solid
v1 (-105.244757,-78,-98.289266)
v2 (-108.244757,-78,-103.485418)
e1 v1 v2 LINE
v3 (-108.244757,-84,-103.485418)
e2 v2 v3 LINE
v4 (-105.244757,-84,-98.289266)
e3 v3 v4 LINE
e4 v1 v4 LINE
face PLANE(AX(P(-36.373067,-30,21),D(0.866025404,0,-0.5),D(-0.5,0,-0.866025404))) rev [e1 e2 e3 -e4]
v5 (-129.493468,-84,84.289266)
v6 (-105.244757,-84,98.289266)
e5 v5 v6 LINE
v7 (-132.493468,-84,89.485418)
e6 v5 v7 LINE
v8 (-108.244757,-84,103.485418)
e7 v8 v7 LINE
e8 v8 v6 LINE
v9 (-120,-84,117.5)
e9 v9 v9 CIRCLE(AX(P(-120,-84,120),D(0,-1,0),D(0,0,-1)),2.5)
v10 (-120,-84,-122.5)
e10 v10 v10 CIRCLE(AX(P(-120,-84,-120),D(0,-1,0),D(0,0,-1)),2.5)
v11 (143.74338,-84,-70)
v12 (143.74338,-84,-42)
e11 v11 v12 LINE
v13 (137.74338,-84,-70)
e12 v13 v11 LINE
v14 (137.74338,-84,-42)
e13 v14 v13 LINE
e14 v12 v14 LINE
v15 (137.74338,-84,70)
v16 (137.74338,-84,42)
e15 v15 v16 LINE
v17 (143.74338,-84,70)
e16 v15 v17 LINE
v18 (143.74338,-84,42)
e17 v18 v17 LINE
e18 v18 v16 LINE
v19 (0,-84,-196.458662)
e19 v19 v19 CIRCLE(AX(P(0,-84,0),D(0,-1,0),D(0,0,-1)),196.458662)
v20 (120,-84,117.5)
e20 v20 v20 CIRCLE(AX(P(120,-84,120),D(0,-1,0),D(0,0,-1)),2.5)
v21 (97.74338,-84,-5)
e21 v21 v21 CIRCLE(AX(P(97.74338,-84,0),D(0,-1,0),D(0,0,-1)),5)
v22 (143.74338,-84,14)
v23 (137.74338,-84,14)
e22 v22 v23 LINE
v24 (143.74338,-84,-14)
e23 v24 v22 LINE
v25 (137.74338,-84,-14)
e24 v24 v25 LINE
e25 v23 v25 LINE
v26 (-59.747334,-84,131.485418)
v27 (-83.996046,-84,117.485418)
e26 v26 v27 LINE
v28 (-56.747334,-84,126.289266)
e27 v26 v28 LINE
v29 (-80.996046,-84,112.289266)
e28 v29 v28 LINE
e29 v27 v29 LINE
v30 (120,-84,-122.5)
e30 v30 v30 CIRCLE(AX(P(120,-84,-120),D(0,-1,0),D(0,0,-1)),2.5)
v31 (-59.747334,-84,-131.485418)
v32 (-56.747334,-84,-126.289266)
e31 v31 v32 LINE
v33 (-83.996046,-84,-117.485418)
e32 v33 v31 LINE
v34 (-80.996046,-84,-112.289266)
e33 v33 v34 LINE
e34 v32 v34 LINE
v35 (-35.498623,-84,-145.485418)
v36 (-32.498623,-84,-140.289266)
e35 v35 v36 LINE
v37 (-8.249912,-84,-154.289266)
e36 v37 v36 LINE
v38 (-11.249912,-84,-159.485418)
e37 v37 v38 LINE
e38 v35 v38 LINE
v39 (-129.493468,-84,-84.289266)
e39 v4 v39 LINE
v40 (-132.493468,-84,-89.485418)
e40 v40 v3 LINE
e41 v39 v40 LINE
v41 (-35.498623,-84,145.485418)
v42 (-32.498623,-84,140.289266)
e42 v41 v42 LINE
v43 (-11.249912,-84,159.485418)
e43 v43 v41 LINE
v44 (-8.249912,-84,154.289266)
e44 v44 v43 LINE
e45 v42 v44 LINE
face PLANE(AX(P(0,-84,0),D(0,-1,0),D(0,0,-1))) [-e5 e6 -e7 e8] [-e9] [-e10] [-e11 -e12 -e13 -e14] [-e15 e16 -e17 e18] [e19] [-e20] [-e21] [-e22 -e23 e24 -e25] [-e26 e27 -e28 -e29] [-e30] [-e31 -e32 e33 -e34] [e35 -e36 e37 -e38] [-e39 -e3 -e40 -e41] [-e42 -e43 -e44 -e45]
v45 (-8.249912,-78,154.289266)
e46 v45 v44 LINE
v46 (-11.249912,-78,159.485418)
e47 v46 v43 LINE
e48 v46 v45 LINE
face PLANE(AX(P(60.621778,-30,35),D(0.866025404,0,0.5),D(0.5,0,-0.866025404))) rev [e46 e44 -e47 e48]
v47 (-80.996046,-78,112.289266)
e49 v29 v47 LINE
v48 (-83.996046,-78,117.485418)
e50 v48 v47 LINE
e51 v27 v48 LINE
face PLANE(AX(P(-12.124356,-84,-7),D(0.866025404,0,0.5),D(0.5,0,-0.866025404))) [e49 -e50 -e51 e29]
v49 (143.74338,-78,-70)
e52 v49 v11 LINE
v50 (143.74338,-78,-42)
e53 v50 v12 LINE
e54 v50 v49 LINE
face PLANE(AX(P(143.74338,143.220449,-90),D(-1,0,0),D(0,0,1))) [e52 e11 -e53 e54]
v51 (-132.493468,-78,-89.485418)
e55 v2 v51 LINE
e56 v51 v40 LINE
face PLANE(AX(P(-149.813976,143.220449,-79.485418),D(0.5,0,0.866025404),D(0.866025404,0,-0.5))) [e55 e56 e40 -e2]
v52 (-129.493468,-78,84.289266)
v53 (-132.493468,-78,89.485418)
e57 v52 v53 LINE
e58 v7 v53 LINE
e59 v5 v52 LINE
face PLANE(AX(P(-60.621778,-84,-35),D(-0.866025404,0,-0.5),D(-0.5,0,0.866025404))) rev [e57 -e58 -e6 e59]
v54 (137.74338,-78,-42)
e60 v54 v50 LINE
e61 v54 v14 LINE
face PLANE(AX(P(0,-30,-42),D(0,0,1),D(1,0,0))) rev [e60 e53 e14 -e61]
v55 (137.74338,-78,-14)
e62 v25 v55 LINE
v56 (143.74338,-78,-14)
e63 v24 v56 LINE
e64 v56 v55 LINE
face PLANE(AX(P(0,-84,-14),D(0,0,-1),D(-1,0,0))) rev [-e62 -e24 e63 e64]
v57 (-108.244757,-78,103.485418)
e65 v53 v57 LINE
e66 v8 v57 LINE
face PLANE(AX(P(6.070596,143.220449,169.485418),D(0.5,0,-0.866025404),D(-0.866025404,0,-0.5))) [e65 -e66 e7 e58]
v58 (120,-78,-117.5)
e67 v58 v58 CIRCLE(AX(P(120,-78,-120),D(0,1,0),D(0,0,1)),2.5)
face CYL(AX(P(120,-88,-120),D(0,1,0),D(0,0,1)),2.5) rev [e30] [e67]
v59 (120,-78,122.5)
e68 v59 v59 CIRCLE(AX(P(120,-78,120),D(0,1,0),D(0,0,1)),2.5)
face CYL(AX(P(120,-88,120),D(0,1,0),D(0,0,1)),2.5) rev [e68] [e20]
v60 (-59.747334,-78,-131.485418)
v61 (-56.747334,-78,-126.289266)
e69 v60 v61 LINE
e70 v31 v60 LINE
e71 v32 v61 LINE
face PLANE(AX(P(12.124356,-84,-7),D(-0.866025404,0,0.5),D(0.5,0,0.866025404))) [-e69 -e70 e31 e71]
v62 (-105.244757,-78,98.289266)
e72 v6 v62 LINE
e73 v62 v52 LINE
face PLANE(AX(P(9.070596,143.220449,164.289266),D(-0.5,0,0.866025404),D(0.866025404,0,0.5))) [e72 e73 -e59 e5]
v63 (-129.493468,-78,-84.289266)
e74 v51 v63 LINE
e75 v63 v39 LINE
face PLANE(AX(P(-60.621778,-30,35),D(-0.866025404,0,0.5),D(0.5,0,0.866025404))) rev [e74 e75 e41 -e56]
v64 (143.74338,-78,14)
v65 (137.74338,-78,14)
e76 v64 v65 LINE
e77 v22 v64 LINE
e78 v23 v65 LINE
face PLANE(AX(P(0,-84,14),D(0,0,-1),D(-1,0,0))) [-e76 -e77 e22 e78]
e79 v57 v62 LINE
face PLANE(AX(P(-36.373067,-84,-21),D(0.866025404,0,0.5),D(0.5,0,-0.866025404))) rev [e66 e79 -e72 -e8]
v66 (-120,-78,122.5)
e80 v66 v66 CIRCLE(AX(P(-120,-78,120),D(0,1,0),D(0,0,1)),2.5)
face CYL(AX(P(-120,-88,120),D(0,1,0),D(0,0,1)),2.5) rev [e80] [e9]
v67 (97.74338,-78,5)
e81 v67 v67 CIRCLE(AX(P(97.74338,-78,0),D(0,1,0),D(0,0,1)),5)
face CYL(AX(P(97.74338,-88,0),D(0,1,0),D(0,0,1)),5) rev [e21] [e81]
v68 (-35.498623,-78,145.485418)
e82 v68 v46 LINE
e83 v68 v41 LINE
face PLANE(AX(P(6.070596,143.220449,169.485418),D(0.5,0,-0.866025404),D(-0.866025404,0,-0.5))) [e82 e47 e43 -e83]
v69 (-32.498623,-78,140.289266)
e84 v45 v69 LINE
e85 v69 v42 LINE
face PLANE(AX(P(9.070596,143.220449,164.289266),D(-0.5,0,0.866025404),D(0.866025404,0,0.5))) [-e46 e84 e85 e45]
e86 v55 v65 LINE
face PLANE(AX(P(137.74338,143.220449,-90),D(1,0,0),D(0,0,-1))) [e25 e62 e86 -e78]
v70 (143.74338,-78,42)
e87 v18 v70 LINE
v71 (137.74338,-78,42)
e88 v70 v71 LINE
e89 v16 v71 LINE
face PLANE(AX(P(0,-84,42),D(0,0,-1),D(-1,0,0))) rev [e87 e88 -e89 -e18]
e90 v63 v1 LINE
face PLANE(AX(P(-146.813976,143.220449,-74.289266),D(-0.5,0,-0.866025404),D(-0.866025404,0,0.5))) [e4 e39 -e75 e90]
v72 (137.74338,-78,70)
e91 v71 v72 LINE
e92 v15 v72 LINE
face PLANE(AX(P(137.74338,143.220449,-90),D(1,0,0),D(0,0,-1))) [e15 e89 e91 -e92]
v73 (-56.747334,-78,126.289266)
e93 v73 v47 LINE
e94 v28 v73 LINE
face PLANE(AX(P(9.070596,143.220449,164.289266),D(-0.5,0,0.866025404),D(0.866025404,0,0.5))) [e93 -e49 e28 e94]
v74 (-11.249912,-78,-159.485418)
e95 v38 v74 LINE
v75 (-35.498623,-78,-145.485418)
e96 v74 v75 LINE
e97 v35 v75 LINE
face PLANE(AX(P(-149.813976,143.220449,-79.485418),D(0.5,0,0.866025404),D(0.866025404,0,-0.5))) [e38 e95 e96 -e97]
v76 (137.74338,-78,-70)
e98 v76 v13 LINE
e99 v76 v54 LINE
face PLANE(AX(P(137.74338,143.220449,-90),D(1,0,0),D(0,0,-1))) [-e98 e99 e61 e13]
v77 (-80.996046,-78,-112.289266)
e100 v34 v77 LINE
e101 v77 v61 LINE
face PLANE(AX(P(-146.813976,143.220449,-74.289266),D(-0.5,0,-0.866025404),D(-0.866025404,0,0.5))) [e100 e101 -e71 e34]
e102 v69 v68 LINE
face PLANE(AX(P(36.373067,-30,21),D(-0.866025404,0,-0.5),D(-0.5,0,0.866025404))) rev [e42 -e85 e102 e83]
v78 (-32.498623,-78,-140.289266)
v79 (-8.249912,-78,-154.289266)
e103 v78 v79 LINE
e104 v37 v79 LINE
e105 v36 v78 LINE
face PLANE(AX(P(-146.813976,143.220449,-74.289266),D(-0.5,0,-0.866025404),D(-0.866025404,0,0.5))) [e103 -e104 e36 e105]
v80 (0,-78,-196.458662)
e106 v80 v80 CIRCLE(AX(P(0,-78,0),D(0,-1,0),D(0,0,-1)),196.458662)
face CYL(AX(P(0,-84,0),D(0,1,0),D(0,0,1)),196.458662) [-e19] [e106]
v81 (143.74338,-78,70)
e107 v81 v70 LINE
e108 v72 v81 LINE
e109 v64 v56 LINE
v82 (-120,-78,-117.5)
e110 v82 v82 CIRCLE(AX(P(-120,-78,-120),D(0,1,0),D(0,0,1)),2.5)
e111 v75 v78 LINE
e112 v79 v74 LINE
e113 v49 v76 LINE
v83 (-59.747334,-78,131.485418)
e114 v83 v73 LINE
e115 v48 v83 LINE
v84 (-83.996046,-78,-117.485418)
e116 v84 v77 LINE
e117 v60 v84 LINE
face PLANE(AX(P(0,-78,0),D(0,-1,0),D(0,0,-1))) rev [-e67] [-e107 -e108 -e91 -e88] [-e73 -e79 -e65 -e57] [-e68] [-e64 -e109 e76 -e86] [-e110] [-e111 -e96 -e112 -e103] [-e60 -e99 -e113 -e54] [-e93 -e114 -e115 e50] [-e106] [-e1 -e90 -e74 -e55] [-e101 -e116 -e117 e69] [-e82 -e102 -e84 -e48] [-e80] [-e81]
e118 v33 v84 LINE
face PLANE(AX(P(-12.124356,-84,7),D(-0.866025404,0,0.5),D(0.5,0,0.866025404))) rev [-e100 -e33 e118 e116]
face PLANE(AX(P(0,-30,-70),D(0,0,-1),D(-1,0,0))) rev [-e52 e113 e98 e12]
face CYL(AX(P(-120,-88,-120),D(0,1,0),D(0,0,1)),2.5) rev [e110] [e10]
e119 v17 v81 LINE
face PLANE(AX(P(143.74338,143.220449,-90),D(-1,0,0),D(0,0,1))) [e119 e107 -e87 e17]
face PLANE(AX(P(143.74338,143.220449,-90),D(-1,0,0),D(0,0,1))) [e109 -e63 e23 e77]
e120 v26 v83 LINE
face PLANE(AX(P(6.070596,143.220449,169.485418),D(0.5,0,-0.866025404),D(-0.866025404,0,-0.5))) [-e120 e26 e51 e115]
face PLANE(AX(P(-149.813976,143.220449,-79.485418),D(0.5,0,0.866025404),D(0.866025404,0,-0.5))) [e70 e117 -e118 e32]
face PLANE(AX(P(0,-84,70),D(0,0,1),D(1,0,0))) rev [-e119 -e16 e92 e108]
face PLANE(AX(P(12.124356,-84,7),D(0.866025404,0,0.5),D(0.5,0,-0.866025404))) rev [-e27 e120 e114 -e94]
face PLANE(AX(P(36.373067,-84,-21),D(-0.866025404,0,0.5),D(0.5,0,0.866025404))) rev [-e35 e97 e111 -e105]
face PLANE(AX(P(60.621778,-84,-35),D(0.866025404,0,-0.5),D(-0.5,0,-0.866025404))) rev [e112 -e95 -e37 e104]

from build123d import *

# Parameters (mm, degrees)
ESQUISSE1_R             = 196.45866198
BOSS_EXTRU_1_DEPTH      = 6
EMPREINTE1_START        = -84
EMPREINTE1_OUTLINE_W    = 6
EMPREINTE1_OUTLINE_H    = 28
EMPREINTE1_DEPTH        = 6
ESQUISSE2_R             = 5
ENL_V_MAT_EXTRU_1_DEPTH = 10


# Read off the part's stored shape, not the designer's step: Empreinte1
with BuildPart() as part:
    # Esquisse1 → Boss.-Extru.1 (new body)
    with BuildSketch(Plane(origin=(0, -78, 0), x_dir=(-1, 0, 0), z_dir=(0, -1, 0))):
        with Locations(Location((0, 0, 0), (0, 0, 90))):
            Circle(ESQUISSE1_R)
    extrude(amount=BOSS_EXTRU_1_DEPTH)

    # Empreinte1 outline → Empreinte1 (cut)
    with BuildSketch(Plane(origin=(0, 0, 0), x_dir=(1, 0, 0), z_dir=(0, 1, 0)).offset(EMPREINTE1_START)):
        Polygon((-11.249911594, 159.485418462), (-35.4986229, 145.485418462), (-32.4986229, 140.28926604), (-8.249911594, 154.28926604), align=None)
        Polygon((-59.747334206, 131.485418462), (-83.996045512, 117.485418462), (-80.996045512, 112.28926604), (-56.747334206, 126.28926604), align=None)
        Polygon((-108.244756818, 103.485418462), (-132.493468124, 89.485418462), (-129.493468124, 84.28926604), (-105.244756818, 98.28926604), align=None)
        with Locations((140.743379719, -56)):
            Rectangle(EMPREINTE1_OUTLINE_W, EMPREINTE1_OUTLINE_H)
        with Locations((140.743379719, 0)):
            Rectangle(EMPREINTE1_OUTLINE_W, EMPREINTE1_OUTLINE_H)
        with Locations((140.743379719, 56)):
            Rectangle(EMPREINTE1_OUTLINE_W, EMPREINTE1_OUTLINE_H)
        Polygon((-132.493468124, -89.485418462), (-108.244756818, -103.485418462), (-105.244756818, -98.28926604), (-129.493468124, -84.28926604), align=None)
        Polygon((-83.996045512, -117.485418462), (-59.747334206, -131.485418462), (-56.747334206, -126.28926604), (-80.996045512, -112.28926604), align=None)
        Polygon((-35.4986229, -145.485418462), (-11.249911594, -159.485418462), (-8.249911594, -154.28926604), (-32.4986229, -140.28926604), align=None)
    extrude(amount=EMPREINTE1_DEPTH, mode=Mode.SUBTRACT)

    # Esquisse2 → Enlèv. mat.-Extru.1 (cut)
    with BuildSketch(Plane(origin=(0, -78, 0), x_dir=(1, 0, 0), z_dir=(0, 1, 0))):
        with BuildLine():
            ThreePointArc((-117.5, 120), (-121.767766953, 121.767766953), (-120, 117.5))
            Line((-120, 117.5), (-120, 120))
            Line((-120, 120), (-117.5, 120))
        make_face()
        with BuildLine():
            Line((-120, 120), (-120, 117.5))
            ThreePointArc((-120, 117.5), (-118.232233047, 118.232233047), (-117.5, 120))
            Line((-117.5, 120), (-120, 120))
        make_face()
        with BuildLine():
            ThreePointArc((117.5, 120), (118.232233047, 118.232233047), (120, 117.5))
            Line((120, 117.5), (120, 120))
            Line((120, 120), (117.5, 120))
        make_face()
        with BuildLine():
            Line((120, 120), (120, 117.5))
            ThreePointArc((120, 117.5), (121.767766953, 118.232233047), (122.5, 120))
            ThreePointArc((122.5, 120), (120, 122.5), (117.5, 120))
            Line((117.5, 120), (120, 120))
        make_face()
        with BuildLine():
            ThreePointArc((120, -117.5), (118.232233047, -118.232233047), (117.5, -120))
            Line((117.5, -120), (120, -120))
            Line((120, -120), (120, -117.5))
        make_face()
        with BuildLine():
            Line((120, -120), (117.5, -120))
            ThreePointArc((117.5, -120), (120, -122.5), (122.5, -120))
            ThreePointArc((122.5, -120), (121.767766953, -118.232233047), (120, -117.5))
            Line((120, -117.5), (120, -120))
        make_face()
        with BuildLine():
            Line((-120, -117.5), (-120, -120))
            Line((-120, -120), (-117.5, -120))
            ThreePointArc((-117.5, -120), (-118.232233047, -118.232233047), (-120, -117.5))
        make_face()
        with BuildLine():
            Line((-117.5, -120), (-120, -120))
            Line((-120, -120), (-120, -117.5))
            ThreePointArc((-120, -117.5), (-121.767766953, -121.767766953), (-117.5, -120))
        make_face()
        with Locations(Location((97.743379719, 0, 0), (0, 0, 270))):
            Circle(ESQUISSE2_R)
    extrude(amount=-ENL_V_MAT_EXTRU_1_DEPTH, mode=Mode.SUBTRACT)


solid = part.part
